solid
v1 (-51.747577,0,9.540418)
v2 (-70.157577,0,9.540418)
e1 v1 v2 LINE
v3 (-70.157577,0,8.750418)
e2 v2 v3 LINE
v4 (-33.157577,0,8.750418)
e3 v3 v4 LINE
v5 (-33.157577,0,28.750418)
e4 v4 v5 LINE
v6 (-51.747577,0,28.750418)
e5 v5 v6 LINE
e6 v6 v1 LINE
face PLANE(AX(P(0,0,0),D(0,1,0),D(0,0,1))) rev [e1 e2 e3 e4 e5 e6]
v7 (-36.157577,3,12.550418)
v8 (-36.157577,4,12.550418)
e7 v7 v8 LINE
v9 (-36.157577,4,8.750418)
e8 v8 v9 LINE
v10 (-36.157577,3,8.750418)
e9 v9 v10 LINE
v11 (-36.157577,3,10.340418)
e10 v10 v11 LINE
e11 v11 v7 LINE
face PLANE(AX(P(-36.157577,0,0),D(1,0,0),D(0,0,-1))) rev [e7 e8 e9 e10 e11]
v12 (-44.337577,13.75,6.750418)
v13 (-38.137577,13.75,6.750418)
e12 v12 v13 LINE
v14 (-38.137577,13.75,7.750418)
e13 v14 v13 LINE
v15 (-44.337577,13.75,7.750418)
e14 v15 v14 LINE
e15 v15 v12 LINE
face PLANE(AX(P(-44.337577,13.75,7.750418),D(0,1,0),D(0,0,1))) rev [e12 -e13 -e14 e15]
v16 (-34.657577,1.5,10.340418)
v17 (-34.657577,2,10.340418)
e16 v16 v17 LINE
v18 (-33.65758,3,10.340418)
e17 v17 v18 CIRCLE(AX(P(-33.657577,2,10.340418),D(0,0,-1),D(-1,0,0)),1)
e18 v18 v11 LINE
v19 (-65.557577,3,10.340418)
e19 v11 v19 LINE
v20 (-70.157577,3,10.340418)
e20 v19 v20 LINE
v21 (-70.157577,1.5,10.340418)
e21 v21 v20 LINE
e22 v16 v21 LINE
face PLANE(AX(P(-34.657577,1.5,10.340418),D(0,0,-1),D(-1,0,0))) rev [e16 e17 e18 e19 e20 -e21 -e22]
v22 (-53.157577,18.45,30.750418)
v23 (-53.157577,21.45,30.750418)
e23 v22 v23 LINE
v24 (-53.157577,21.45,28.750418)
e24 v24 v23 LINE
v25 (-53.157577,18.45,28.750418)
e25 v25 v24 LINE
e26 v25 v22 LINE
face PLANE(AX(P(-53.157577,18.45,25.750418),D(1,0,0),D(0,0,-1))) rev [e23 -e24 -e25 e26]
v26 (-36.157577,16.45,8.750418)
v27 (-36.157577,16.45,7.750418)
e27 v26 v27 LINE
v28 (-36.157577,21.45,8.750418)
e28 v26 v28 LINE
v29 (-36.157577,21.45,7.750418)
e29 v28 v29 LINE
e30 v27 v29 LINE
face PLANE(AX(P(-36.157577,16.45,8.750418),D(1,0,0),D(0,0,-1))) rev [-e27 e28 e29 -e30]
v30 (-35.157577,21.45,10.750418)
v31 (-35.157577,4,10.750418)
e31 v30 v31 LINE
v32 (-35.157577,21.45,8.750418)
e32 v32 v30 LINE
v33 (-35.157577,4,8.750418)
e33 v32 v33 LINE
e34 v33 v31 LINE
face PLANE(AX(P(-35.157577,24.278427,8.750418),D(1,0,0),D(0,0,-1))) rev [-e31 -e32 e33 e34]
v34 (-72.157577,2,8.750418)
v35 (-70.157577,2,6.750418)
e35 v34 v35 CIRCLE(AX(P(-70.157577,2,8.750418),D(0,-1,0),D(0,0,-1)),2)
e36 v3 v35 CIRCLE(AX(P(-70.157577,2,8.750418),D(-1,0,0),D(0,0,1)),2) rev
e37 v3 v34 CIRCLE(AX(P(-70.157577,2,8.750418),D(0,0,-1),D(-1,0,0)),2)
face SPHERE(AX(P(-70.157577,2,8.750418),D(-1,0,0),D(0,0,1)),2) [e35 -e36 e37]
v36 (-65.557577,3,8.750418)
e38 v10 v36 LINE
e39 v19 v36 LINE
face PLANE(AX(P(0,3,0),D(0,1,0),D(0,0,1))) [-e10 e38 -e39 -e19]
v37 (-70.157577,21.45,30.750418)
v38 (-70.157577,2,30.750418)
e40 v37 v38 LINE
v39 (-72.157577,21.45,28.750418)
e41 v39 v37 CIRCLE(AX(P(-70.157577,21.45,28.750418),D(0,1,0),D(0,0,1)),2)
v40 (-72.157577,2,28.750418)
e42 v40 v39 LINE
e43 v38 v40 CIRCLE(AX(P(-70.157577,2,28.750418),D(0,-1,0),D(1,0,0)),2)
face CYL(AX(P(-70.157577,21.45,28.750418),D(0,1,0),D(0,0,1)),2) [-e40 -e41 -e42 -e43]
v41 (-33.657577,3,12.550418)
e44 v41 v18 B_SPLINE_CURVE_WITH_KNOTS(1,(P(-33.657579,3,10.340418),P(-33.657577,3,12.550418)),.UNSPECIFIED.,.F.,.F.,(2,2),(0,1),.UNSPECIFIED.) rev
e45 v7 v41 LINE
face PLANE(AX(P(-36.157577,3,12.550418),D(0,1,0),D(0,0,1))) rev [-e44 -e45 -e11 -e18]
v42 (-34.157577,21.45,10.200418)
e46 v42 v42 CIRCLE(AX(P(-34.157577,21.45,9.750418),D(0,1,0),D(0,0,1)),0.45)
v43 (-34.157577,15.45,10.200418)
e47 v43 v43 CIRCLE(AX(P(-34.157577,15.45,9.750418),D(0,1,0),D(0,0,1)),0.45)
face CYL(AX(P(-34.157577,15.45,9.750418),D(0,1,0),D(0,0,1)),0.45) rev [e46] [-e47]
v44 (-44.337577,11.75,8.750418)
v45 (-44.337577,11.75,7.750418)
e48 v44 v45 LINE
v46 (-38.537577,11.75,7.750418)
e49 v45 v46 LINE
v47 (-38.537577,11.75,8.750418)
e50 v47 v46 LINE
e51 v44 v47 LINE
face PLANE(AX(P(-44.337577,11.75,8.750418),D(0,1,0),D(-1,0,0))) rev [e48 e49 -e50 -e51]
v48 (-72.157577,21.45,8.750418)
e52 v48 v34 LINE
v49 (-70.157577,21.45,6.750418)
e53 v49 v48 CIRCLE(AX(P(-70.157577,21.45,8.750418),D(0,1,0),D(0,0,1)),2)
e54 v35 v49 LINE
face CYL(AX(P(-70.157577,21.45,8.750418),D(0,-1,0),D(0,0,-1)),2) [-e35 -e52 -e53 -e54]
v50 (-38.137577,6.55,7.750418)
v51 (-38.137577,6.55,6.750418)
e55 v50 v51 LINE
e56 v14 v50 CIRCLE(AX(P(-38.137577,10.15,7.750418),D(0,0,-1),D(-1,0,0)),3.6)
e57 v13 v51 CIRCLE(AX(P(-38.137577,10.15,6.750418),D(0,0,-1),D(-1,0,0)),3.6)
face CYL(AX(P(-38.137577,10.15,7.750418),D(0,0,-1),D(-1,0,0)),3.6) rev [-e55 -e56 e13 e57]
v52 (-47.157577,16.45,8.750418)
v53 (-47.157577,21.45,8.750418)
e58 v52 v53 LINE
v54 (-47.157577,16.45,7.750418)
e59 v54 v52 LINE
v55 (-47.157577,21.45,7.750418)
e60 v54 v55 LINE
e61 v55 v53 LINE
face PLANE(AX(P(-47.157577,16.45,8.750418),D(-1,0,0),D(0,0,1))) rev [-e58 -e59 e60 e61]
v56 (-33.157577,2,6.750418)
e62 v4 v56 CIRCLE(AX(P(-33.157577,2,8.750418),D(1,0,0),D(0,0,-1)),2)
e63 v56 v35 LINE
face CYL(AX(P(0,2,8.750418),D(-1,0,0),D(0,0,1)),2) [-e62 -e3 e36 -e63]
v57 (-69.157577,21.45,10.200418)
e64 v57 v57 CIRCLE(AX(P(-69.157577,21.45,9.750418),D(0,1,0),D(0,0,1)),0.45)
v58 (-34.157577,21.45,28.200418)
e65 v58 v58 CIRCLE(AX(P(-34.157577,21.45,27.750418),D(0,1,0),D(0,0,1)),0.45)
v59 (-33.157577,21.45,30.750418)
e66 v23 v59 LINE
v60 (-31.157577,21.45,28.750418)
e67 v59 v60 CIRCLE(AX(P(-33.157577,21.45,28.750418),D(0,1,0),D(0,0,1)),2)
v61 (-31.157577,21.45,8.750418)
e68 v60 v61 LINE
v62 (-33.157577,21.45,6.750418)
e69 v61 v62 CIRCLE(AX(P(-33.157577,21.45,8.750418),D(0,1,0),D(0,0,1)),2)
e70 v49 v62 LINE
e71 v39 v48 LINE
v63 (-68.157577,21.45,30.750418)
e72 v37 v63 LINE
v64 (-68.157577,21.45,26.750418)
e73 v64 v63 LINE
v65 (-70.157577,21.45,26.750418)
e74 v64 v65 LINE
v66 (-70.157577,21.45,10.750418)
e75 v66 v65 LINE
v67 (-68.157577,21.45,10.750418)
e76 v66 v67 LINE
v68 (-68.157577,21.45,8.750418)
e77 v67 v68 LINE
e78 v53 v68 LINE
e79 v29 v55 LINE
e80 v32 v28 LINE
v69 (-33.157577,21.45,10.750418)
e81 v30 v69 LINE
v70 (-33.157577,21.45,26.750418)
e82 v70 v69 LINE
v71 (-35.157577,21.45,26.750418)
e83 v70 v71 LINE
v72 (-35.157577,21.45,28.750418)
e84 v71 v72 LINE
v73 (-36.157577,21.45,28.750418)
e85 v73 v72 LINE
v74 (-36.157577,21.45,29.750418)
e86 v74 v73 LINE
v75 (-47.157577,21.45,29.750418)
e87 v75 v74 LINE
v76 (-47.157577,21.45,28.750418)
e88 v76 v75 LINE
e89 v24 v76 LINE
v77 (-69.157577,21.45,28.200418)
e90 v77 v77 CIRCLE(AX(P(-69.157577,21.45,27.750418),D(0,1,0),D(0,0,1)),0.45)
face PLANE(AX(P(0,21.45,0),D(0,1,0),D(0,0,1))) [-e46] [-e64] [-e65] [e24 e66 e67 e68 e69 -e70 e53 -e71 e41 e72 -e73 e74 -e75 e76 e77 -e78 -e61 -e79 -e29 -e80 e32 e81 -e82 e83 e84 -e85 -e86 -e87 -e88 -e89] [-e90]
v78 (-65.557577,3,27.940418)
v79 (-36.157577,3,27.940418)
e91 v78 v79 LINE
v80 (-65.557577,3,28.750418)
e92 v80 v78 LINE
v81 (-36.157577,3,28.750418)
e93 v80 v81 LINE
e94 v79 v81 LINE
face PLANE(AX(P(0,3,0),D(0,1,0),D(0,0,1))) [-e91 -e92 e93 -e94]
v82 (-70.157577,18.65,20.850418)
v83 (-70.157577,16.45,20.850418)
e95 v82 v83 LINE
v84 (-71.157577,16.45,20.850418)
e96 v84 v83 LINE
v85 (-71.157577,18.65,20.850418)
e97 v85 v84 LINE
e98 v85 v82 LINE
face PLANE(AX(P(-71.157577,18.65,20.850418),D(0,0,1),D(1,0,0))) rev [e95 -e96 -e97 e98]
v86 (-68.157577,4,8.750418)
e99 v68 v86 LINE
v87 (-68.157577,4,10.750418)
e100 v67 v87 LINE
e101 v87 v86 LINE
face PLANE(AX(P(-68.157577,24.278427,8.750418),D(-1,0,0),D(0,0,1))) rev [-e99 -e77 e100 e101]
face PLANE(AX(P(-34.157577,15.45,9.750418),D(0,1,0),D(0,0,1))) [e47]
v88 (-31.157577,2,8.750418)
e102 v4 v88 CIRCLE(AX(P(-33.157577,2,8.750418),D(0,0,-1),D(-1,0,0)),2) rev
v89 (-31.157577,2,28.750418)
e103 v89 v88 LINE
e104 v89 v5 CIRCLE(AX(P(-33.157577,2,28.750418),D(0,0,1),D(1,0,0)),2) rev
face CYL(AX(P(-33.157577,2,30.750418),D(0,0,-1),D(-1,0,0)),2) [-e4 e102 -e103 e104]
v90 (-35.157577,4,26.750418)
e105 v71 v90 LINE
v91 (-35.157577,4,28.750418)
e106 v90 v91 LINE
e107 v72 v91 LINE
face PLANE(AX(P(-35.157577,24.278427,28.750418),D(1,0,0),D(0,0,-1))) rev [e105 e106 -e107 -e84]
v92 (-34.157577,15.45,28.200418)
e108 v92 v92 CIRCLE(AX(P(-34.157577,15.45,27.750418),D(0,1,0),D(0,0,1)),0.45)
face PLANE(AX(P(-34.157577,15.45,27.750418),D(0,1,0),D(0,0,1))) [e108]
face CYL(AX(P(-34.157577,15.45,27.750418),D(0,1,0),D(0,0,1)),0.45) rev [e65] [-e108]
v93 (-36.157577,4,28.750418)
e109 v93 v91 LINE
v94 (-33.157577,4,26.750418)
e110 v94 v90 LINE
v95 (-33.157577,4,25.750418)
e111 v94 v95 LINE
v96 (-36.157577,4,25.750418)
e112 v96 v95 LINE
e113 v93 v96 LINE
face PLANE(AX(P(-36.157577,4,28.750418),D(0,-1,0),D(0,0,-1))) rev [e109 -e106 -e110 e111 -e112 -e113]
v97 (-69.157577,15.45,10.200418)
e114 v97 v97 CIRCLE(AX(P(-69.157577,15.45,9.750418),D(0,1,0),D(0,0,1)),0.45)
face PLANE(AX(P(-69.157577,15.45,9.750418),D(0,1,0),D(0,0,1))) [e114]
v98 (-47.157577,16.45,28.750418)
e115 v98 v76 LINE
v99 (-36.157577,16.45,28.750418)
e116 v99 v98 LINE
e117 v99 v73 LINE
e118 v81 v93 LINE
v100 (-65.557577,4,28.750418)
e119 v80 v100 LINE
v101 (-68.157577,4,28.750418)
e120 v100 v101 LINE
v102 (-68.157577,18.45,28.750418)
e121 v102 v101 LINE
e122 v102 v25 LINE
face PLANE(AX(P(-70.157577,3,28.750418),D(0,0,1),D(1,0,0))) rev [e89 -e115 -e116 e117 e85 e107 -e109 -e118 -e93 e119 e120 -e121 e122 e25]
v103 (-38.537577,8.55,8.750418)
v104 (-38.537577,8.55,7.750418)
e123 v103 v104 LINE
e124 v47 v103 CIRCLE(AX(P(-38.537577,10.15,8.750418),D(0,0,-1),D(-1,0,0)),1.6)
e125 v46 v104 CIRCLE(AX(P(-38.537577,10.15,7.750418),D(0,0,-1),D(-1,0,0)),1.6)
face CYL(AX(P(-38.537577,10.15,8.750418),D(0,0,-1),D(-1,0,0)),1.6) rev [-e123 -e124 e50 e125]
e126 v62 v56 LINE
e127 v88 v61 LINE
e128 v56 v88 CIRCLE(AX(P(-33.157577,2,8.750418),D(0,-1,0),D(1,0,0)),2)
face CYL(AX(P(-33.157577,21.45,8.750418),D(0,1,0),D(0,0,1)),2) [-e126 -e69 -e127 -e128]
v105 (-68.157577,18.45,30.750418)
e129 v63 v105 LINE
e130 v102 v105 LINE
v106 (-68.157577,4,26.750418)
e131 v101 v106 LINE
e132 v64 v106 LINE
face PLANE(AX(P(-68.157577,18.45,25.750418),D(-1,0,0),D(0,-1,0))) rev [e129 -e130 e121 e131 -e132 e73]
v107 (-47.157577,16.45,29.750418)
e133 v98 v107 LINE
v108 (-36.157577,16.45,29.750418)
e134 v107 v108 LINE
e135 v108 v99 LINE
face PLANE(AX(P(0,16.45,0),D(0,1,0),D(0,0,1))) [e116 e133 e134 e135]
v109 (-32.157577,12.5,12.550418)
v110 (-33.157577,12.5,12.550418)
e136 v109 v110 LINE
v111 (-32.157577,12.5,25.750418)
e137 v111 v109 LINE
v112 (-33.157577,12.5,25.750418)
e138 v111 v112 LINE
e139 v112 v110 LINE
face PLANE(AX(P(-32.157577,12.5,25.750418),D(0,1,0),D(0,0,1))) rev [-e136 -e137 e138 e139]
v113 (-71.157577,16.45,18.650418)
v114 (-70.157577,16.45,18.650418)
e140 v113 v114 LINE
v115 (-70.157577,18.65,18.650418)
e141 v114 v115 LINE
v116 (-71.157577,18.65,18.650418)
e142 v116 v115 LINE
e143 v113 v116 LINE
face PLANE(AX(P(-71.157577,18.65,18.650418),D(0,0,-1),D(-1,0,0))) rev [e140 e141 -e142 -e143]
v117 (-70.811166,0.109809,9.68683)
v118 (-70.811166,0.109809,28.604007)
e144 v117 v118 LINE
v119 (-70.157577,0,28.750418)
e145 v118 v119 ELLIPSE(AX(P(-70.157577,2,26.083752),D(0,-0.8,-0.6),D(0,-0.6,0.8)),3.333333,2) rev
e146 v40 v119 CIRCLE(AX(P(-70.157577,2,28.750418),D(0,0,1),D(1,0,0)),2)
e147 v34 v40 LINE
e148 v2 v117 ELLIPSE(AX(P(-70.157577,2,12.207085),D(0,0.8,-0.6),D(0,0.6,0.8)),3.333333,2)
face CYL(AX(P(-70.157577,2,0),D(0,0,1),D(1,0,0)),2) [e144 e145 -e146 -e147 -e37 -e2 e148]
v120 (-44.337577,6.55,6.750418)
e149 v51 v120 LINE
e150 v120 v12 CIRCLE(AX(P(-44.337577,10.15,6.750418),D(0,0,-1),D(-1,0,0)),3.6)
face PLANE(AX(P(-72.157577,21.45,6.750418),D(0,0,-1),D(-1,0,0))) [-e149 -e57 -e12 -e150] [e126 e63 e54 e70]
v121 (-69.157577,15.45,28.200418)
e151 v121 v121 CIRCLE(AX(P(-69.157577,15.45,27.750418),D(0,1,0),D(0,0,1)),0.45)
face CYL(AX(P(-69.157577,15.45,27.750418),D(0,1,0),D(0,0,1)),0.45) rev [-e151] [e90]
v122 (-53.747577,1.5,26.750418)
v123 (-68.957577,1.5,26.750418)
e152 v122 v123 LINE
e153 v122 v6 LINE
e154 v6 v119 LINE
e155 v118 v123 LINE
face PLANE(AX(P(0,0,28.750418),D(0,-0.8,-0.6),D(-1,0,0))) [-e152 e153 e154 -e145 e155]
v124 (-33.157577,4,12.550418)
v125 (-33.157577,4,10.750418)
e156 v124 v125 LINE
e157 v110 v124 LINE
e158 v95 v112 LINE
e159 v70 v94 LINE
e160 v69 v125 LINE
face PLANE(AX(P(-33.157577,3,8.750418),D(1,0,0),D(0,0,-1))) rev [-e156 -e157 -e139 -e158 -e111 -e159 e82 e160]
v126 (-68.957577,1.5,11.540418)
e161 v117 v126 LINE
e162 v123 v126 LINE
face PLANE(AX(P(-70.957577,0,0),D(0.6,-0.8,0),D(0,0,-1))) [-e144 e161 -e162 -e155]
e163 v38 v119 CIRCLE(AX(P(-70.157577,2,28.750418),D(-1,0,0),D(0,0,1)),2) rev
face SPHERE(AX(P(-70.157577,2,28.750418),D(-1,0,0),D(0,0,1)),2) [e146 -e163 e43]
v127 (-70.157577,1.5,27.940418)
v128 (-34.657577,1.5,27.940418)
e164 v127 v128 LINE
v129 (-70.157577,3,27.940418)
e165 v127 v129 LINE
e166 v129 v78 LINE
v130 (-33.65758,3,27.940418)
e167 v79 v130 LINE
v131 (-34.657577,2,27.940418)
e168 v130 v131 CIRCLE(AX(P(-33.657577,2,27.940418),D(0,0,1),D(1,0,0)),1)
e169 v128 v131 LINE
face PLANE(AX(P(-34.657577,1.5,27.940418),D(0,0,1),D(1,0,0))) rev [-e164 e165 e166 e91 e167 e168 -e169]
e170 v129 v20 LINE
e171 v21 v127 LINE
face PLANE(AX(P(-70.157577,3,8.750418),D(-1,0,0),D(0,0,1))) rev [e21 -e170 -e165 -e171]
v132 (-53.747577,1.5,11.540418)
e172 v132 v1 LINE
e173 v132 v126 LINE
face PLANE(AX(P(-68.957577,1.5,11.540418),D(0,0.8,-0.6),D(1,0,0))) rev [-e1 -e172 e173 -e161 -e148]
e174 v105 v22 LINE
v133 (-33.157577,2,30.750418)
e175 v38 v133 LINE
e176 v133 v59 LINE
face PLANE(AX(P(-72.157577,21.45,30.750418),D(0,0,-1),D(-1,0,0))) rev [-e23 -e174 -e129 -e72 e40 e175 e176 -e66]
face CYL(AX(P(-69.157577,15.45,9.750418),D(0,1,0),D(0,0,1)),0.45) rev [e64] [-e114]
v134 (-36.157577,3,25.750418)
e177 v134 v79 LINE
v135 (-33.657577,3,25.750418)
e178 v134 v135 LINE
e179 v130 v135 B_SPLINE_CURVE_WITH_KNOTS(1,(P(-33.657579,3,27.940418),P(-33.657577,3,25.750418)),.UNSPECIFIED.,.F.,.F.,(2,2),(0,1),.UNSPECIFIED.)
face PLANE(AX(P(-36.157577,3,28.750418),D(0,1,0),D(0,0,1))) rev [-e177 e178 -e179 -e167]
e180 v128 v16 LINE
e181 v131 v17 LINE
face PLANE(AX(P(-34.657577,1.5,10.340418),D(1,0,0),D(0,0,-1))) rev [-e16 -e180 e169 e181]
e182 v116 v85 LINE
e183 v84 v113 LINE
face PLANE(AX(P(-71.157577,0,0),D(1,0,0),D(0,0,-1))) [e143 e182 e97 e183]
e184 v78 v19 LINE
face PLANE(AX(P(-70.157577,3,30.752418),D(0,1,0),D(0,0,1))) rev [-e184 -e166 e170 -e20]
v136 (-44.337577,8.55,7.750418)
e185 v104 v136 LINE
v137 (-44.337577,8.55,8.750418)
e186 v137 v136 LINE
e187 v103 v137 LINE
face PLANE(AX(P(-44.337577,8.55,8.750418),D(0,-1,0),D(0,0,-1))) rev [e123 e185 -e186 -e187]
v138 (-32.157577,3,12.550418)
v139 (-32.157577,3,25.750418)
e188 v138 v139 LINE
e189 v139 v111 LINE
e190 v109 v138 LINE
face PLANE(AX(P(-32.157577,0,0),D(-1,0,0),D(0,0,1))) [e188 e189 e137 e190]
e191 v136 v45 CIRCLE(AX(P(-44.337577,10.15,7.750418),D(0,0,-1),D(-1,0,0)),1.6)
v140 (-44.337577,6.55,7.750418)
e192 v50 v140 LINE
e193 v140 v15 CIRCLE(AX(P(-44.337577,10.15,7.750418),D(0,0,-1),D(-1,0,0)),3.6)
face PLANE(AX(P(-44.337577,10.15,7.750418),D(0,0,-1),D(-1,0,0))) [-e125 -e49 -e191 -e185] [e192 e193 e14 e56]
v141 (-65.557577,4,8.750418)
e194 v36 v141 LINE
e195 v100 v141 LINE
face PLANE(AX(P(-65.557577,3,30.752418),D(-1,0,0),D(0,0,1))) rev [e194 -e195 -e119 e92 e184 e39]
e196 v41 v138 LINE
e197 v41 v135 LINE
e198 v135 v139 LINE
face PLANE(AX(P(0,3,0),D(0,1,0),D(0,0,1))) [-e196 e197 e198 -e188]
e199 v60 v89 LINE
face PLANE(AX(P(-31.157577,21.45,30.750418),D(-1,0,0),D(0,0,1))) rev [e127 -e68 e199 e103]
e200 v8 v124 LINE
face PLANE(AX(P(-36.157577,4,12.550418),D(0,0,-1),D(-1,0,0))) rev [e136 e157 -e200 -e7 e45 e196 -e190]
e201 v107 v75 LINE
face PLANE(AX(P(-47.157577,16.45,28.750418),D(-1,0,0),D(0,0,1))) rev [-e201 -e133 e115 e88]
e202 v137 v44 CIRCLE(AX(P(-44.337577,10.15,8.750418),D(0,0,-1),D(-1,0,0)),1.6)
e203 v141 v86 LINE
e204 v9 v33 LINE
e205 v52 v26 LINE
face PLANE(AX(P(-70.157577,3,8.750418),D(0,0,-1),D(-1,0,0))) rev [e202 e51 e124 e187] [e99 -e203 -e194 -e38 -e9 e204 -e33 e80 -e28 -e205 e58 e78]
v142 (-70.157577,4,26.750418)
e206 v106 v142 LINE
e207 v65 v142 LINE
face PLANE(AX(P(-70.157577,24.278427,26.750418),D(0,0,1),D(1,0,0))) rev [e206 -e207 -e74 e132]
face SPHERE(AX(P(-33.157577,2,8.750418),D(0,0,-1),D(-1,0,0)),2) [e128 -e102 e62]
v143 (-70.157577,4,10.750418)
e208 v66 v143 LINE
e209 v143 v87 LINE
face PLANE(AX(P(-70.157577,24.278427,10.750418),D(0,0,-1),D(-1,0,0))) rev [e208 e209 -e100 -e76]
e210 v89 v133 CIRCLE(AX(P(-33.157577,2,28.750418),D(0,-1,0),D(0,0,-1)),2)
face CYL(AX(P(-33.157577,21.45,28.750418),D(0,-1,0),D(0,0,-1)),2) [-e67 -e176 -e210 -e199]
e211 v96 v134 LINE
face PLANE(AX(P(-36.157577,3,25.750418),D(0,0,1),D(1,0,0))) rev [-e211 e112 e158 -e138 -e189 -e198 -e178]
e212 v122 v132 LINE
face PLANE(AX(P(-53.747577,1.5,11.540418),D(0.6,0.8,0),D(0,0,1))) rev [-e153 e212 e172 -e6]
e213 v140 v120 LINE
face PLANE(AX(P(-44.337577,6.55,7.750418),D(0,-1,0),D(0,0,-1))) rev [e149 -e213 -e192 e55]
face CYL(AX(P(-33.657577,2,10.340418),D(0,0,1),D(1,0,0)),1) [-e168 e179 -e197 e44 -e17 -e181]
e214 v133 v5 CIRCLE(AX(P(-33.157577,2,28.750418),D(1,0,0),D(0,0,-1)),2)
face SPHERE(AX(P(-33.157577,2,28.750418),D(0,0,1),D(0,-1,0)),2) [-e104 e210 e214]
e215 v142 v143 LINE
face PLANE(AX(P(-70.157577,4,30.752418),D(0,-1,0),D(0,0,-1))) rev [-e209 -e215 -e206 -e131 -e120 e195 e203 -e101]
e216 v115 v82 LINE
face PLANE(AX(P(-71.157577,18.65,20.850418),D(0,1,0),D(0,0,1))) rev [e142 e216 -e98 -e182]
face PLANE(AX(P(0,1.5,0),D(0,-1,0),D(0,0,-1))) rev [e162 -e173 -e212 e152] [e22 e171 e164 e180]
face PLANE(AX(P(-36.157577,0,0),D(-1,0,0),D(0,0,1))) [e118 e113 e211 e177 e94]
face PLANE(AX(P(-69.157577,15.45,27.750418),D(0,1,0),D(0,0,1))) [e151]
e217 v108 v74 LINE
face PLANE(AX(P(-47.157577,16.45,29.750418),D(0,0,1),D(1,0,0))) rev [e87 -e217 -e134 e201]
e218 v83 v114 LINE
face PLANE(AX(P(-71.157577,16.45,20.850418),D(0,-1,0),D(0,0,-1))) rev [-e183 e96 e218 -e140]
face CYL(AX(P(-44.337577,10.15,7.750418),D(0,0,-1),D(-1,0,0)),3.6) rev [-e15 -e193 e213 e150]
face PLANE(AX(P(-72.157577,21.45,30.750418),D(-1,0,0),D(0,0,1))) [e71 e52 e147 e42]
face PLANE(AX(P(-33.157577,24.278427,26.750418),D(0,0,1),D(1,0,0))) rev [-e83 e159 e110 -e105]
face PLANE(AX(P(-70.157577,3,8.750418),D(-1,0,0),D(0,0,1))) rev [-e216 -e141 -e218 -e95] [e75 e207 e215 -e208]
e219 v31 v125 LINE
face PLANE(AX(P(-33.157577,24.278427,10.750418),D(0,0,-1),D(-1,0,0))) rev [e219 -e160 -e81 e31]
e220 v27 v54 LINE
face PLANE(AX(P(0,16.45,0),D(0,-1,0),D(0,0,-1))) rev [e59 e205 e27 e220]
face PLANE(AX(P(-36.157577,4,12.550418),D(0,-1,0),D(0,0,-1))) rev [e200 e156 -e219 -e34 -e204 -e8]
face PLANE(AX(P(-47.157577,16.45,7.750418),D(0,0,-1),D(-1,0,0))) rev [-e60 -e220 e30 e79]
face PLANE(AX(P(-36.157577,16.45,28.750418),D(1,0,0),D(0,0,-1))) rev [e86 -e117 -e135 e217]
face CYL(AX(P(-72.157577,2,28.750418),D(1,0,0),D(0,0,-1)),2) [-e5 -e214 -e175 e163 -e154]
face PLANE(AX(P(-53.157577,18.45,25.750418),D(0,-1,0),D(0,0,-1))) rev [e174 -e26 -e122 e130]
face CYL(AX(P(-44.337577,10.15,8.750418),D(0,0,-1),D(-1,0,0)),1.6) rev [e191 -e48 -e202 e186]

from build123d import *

# Parameters (mm, degrees)
SKETCH_1_W           = 41
SKETCH_1_H           = 24
EXTRUDE_1_DEPTH      = 21.45
SKETCH_2_W           = 37
SKETCH_2_H           = 20
CUT_EXTRUDE_1_DEPTH  = 18.45
SKETCH_4_W           = 15.21
SKETCH_4_H           = 15.21
CUT_EXTRUDE_2_DEPTH  = 15
SKETCH_6_W           = 15
SKETCH_6_H           = 3
CUT_EXTRUDE_4_DEPTH  = 5
CUT_EXTRUDE_7_DEPTH  = 1
CUT_EXTRUDE_8_DEPTH  = 1
SKETCH_11_W          = 35.5
SKETCH_11_H          = 17.6
CUT_EXTRUDE_10_DEPTH = 1.5
SKETCH_13_W          = 11
SKETCH_13_H          = 1
CUT_EXTRUDE_12_DEPTH = 5
FILLET_2_R           = 2
CHAMFER_2_SIZE       = 2
CHAMFER_2_SIZE_2     = 1.5
SKETCH_19_W          = 2.2
SKETCH_19_H          = 2.2
CUT_EXTRUDE_16_DEPTH = 1
SKETCH_21_W          = 3.8
SKETCH_21_H          = 1
SKETCH_21_W_2        = 3
EXTRUDE_4_DEPTH      = 3
FILLET_8_R           = 1
SKETCH_24_W          = 13.2
SKETCH_24_H          = 9.5
CUT_EXTRUDE_17_DEPTH = 1
EXTRUDE_6_REACH      = 80.427
SKETCH_27_W          = 4.6
SKETCH_27_H          = 1
SKETCH_28_W          = 2
SKETCH_28_H          = 2
EXTRUDE_7_DEPTH      = 17.45
SKETCH_29_R          = 0.45
CUT_EXTRUDE_18_DEPTH = 6


with BuildPart() as part:
    # 草图1 → 凸台-拉伸1 (new body)
    with BuildSketch(Plane(origin=(0, 0, 0), x_dir=(1, 0, 0), z_dir=(0, 1, 0))):
        with Locations((-51.657577391, -18.750418409)):
            Rectangle(SKETCH_1_W, SKETCH_1_H)
    extrude(amount=EXTRUDE_1_DEPTH)

    # 草图2 → 切除-拉伸1 (cut)
    with BuildSketch(Plane(origin=(0, 21.45, 0), x_dir=(1, 0, 0), z_dir=(0, 1, 0))):
        with Locations((-51.657577391, -18.750418409)):
            Rectangle(SKETCH_2_W, SKETCH_2_H)
    extrude(amount=-CUT_EXTRUDE_1_DEPTH, mode=Mode.SUBTRACT)

    # 草图4 → 切除-拉伸2 (cut)
    with BuildSketch(Plane(origin=(0, 0, 0), x_dir=(-1, 0, 0), z_dir=(0, -1, 0))):
        with Locations((61.352577391, -19.145418409)):
            Rectangle(SKETCH_4_W, SKETCH_4_H)
    extrude(amount=-CUT_EXTRUDE_2_DEPTH, mode=Mode.SUBTRACT)

    # 草图6 → 切除-拉伸4 (cut)
    with BuildSketch(Plane.XY.offset(30.750418409)):
        with Locations((-60.657577391, 19.95)):
            Rectangle(SKETCH_6_W, SKETCH_6_H)
    extrude(amount=-CUT_EXTRUDE_4_DEPTH, mode=Mode.SUBTRACT)

    # 草图7 → 切除-拉伸7 (cut)
    with BuildSketch(Plane(origin=(0, 0, 6.750418409), x_dir=(-1, 0, 0), z_dir=(0, 0, -1))):
        with BuildLine():
            Line((44.337577391, 6.55), (38.137577391, 6.55))
            ThreePointArc((38.137577391, 6.55), (34.537577391, 10.15), (38.137577391, 13.75))
            Line((38.137577391, 13.75), (44.337577391, 13.75))
            ThreePointArc((44.337577391, 13.75), (47.937577391, 10.15), (44.337577391, 6.55))
        make_face()
    extrude(amount=-CUT_EXTRUDE_7_DEPTH, mode=Mode.SUBTRACT)

    # 草图9 → 切除-拉伸8 (cut)
    with BuildSketch(Plane(origin=(0, 0, 7.750418409), x_dir=(-1, 0, 0), z_dir=(0, 0, -1))):
        with BuildLine():
            Line((44.337577391, 8.55), (38.537577391, 8.55))
            ThreePointArc((38.537577391, 8.55), (36.937577391, 10.15), (38.537577391, 11.75))
            Line((38.537577391, 11.75), (44.337577391, 11.75))
            ThreePointArc((44.337577391, 11.75), (45.937577391, 10.15), (44.337577391, 8.55))
        make_face()
    extrude(amount=-CUT_EXTRUDE_8_DEPTH, mode=Mode.SUBTRACT)

    # 草图11 → 切除-拉伸10 (cut)
    with BuildSketch(Plane(origin=(0, 3, 0), x_dir=(1, 0, 0), z_dir=(0, 1, 0))):
        with Locations((-52.407577391, -19.140418409)):
            Rectangle(SKETCH_11_W, SKETCH_11_H)
    extrude(amount=-CUT_EXTRUDE_10_DEPTH, mode=Mode.SUBTRACT)

    # 草图13 → 切除-拉伸12 (cut)
    with BuildSketch(Plane(origin=(0, 21.45, 0), x_dir=(1, 0, 0), z_dir=(0, 1, 0))):
        with Locations((-41.657577391, -29.250418409)):
            Rectangle(SKETCH_13_W, SKETCH_13_H)
        with Locations((-41.657577391, -8.250418409)):
            Rectangle(SKETCH_13_W, SKETCH_13_H)
    extrude(amount=-CUT_EXTRUDE_12_DEPTH, mode=Mode.SUBTRACT)

    # 圆角2
    fillet_2_edges = [part.edges().sort_by_distance(p)[0] for p in [
        (-72.157577391, 0, 18.750418409),
        (-51.657577391, 0, 30.750418409),
        (-31.157577391, 0, 18.750418409),
        (-51.657577391, 0, 6.750418409),
        (-72.157577391, 10.725, 6.750418409),
        (-72.157577391, 10.725, 30.750418409),
        (-31.157577391, 10.725, 30.750418409),
        (-31.157577391, 10.725, 6.750418409),
    ]]
    fillet(fillet_2_edges, radius=FILLET_2_R)

    # 倒角2
    # the kernel refuses this chamfer: 2, 1.5 mm, written as the material it takes off along each edge
    with BuildSketch(Plane(origin=(-53.747577391, 0, 26.750418409), x_dir=(0, -0.02324952774876386, 0.9997296931968459), z_dir=(-1, 0, 0)), Plane(origin=(-53.747577391, 0, 11.540418409), x_dir=(0.9997296931968459, -0.02324952774876386, 0), z_dir=(0, 0, 1)), Plane(origin=(-68.957577391, 0, 11.540418409), x_dir=(0, -0.02324952774876386, -0.9997296931968459), z_dir=(1, 0, 0)), Plane(origin=(-68.957577391, 0, 26.750418409), x_dir=(-0.9997296931968459, -0.02324952774876394, 0), z_dir=(0, 0, -1))) as chamfer_2_piece_1:
        Polygon((CHAMFER_2_SIZE * 0.999729693197, CHAMFER_2_SIZE * 0.0232495277488), (-CHAMFER_2_SIZE_2 * 0.0232495277488, CHAMFER_2_SIZE_2 * 0.999729693197), (0, 0), align=None)
    extrude(amount=15.21, mode=Mode.SUBTRACT)
    with BuildSketch(Plane(origin=(-48.58618223, 0, 26.750418409), x_dir=(0, -0.02324952774876386, 0.9997296931968459), z_dir=(-1, 0, 0))) as chamfer_2_piece_2a_section:
        Polygon((CHAMFER_2_SIZE * 0.999729693197, CHAMFER_2_SIZE * 0.0232495277488), (-CHAMFER_2_SIZE_2 * 0.0232495277488, CHAMFER_2_SIZE_2 * 0.999729693197), (0, 0), align=None)
    chamfer_2_piece_2a = extrude(amount=20.37139516, mode=Mode.PRIVATE)
    chamfer_2_piece_2a = split(chamfer_2_piece_2a, bisect_by=Plane(origin=(-53.747577391, 0.488589108, 27.415308917), z_dir=(1, 0, 0)), keep=Keep.TOP, mode=Mode.PRIVATE)
    with BuildSketch(Plane(origin=(-53.747577391, 0, 11.540418409), x_dir=(0.9997296931968459, -0.02324952774876386, 0), z_dir=(0, 0, 1))) as chamfer_2_piece_2b_section:
        Polygon((CHAMFER_2_SIZE * 0.999729693197, CHAMFER_2_SIZE * 0.0232495277488), (-CHAMFER_2_SIZE_2 * 0.0232495277488, CHAMFER_2_SIZE_2 * 0.999729693197), (0, 0), align=None)
    chamfer_2_piece_2b = extrude(amount=20.37139516, mode=Mode.PRIVATE)
    chamfer_2_piece_2b = split(chamfer_2_piece_2b, bisect_by=Plane(origin=(-53.082686882, 0.488589108, 26.750418409), z_dir=(0, 0, 1)), keep=Keep.TOP, mode=Mode.PRIVATE)
    chamfer_2_piece_2 = chamfer_2_piece_2a & chamfer_2_piece_2b
    add(chamfer_2_piece_2, mode=Mode.SUBTRACT)
    with BuildSketch(Plane(origin=(-68.957577391, 0, 31.911813569), x_dir=(-0.9997296931968459, -0.02324952774876394, 0), z_dir=(0, 0, -1))) as chamfer_2_piece_3a_section:
        Polygon((CHAMFER_2_SIZE * 0.999729693197, CHAMFER_2_SIZE * 0.0232495277488), (-CHAMFER_2_SIZE_2 * 0.0232495277488, CHAMFER_2_SIZE_2 * 0.999729693197), (0, 0), align=None)
    chamfer_2_piece_3a = extrude(amount=20.37139516, mode=Mode.PRIVATE)
    chamfer_2_piece_3a = split(chamfer_2_piece_3a, bisect_by=Plane(origin=(-69.622467899, 0.488589108, 26.750418409), z_dir=(0, 0, 1)), keep=Keep.TOP, mode=Mode.PRIVATE)
    with BuildSketch(Plane(origin=(-53.747577391, 0, 26.750418409), x_dir=(0, -0.02324952774876386, 0.9997296931968459), z_dir=(-1, 0, 0))) as chamfer_2_piece_3b_section:
        Polygon((CHAMFER_2_SIZE * 0.999729693197, CHAMFER_2_SIZE * 0.0232495277488), (-CHAMFER_2_SIZE_2 * 0.0232495277488, CHAMFER_2_SIZE_2 * 0.999729693197), (0, 0), align=None)
    chamfer_2_piece_3b = extrude(amount=20.37139516, mode=Mode.PRIVATE)
    chamfer_2_piece_3b = split(chamfer_2_piece_3b, bisect_by=Plane(origin=(-68.957577391, 0.488589108, 27.415308917), z_dir=(-1, 0, 0)), keep=Keep.TOP, mode=Mode.PRIVATE)
    chamfer_2_piece_3 = chamfer_2_piece_3a & chamfer_2_piece_3b
    add(chamfer_2_piece_3, mode=Mode.SUBTRACT)
    with BuildSketch(Plane(origin=(-53.747577391, 0, 6.379023249), x_dir=(0.9997296931968459, -0.02324952774876386, 0), z_dir=(0, 0, 1))) as chamfer_2_piece_4a_section:
        Polygon((CHAMFER_2_SIZE * 0.999729693197, CHAMFER_2_SIZE * 0.0232495277488), (-CHAMFER_2_SIZE_2 * 0.0232495277488, CHAMFER_2_SIZE_2 * 0.999729693197), (0, 0), align=None)
    chamfer_2_piece_4a = extrude(amount=20.37139516, mode=Mode.PRIVATE)
    chamfer_2_piece_4a = split(chamfer_2_piece_4a, bisect_by=Plane(origin=(-53.082686882, 0.488589108, 11.540418409), z_dir=(0, 0, -1)), keep=Keep.TOP, mode=Mode.PRIVATE)
    with BuildSketch(Plane(origin=(-68.957577391, 0, 11.540418409), x_dir=(0, -0.02324952774876386, -0.9997296931968459), z_dir=(1, 0, 0))) as chamfer_2_piece_4b_section:
        Polygon((CHAMFER_2_SIZE * 0.999729693197, CHAMFER_2_SIZE * 0.0232495277488), (-CHAMFER_2_SIZE_2 * 0.0232495277488, CHAMFER_2_SIZE_2 * 0.999729693197), (0, 0), align=None)
    chamfer_2_piece_4b = extrude(amount=20.37139516, mode=Mode.PRIVATE)
    chamfer_2_piece_4b = split(chamfer_2_piece_4b, bisect_by=Plane(origin=(-53.747577391, 0.488589108, 10.875527901), z_dir=(1, 0, 0)), keep=Keep.TOP, mode=Mode.PRIVATE)
    chamfer_2_piece_4 = chamfer_2_piece_4a & chamfer_2_piece_4b
    add(chamfer_2_piece_4, mode=Mode.SUBTRACT)
    with BuildSketch(Plane(origin=(-68.957577391, 0, 26.750418409), x_dir=(-0.9997296931968459, -0.02324952774876394, 0), z_dir=(0, 0, -1))) as chamfer_2_piece_5a_section:
        Polygon((CHAMFER_2_SIZE * 0.999729693197, CHAMFER_2_SIZE * 0.0232495277488), (-CHAMFER_2_SIZE_2 * 0.0232495277488, CHAMFER_2_SIZE_2 * 0.999729693197), (0, 0), align=None)
    chamfer_2_piece_5a = extrude(amount=20.37139516, mode=Mode.PRIVATE)
    chamfer_2_piece_5a = split(chamfer_2_piece_5a, bisect_by=Plane(origin=(-69.622467899, 0.488589108, 11.540418409), z_dir=(0, 0, -1)), keep=Keep.TOP, mode=Mode.PRIVATE)
    with BuildSketch(Plane(origin=(-74.118972551, 0, 11.540418409), x_dir=(0, -0.02324952774876386, -0.9997296931968459), z_dir=(1, 0, 0))) as chamfer_2_piece_5b_section:
        Polygon((CHAMFER_2_SIZE * 0.999729693197, CHAMFER_2_SIZE * 0.0232495277488), (-CHAMFER_2_SIZE_2 * 0.0232495277488, CHAMFER_2_SIZE_2 * 0.999729693197), (0, 0), align=None)
    chamfer_2_piece_5b = extrude(amount=20.37139516, mode=Mode.PRIVATE)
    chamfer_2_piece_5b = split(chamfer_2_piece_5b, bisect_by=Plane(origin=(-68.957577391, 0.488589108, 10.875527901), z_dir=(-1, 0, 0)), keep=Keep.TOP, mode=Mode.PRIVATE)
    chamfer_2_piece_5 = chamfer_2_piece_5a & chamfer_2_piece_5b
    add(chamfer_2_piece_5, mode=Mode.SUBTRACT)

    # 草图19 → 切除-拉伸16 (cut)
    with BuildSketch(Plane(origin=(-70.157577391, 0, 0), x_dir=(0, 0, -1), z_dir=(1, 0, 0))):
        with Locations((-19.750418409, 17.55)):
            Rectangle(SKETCH_19_W, SKETCH_19_H)
    extrude(amount=-CUT_EXTRUDE_16_DEPTH, mode=Mode.SUBTRACT)

    # 草图21 → 凸台-拉伸4 (add)
    with BuildSketch(Plane.ZY.offset(33.157577391)):
        with Locations((10.650418409, 3.5)):
            Rectangle(SKETCH_21_W, SKETCH_21_H)
        with Locations((27.250418409, 3.5)):
            Rectangle(SKETCH_21_W_2, SKETCH_21_H)
    extrude(amount=EXTRUDE_4_DEPTH)

    # 圆角8
    # the kernel refuses this fillet: 1 mm, written as the material it takes off along each edge
    with BuildSketch(Plane(origin=(-34.657577391, 3, 28.250418409), x_dir=(1, 0, 0), z_dir=(0, 0, -1))) as fillet_8_piece_1_section:
        with BuildLine():
            CenterArc((FILLET_8_R, FILLET_8_R), FILLET_8_R, 180, 90)
            Line((0, FILLET_8_R), (0, 0))
            Line((0, 0), (FILLET_8_R, 0))
        make_face()
    fillet_8_piece_1 = extrude(amount=15.7, mode=Mode.PRIVATE)
    fillet_8_piece_1 = split(fillet_8_piece_1, bisect_by=Plane(origin=(-34.454104261, 2.75304895, 27.940418409), z_dir=(0, 0, -1)), keep=Keep.TOP, mode=Mode.PRIVATE)
    fillet_8_piece_1 = split(fillet_8_piece_1, bisect_by=Plane(origin=(-34.454104261, 2.75304895, 25.750418409), z_dir=(0, 0, 1)), keep=Keep.TOP, mode=Mode.PRIVATE)
    fillet_8_piece_1 = split(fillet_8_piece_1, bisect_by=Plane(origin=(-34.454104261, 3, 26.845418409), z_dir=(0, -1, 0)), keep=Keep.TOP, mode=Mode.PRIVATE)
    add(fillet_8_piece_1, mode=Mode.SUBTRACT)
    with BuildSketch(Plane(origin=(-34.657577391, 3, 25.750418409), x_dir=(1, 0, 0), z_dir=(0, 0, -1))) as fillet_8_piece_2_section:
        with BuildLine():
            CenterArc((FILLET_8_R, FILLET_8_R), FILLET_8_R, 180, 90)
            Line((0, FILLET_8_R), (0, 0))
            Line((0, 0), (FILLET_8_R, 0))
        make_face()
    fillet_8_piece_2 = extrude(amount=13.2, mode=Mode.PRIVATE)
    fillet_8_piece_2 = split(fillet_8_piece_2, bisect_by=Plane(origin=(-34.454104261, 3, 19.150418409), z_dir=(0, -1, 0)), keep=Keep.TOP, mode=Mode.PRIVATE)
    add(fillet_8_piece_2, mode=Mode.SUBTRACT)
    with BuildSketch(Plane(origin=(-34.657577391, 3, 25.750418409), x_dir=(1, 0, 0), z_dir=(0, 0, -1))) as fillet_8_piece_3_section:
        with BuildLine():
            CenterArc((FILLET_8_R, FILLET_8_R), FILLET_8_R, 180, 90)
            Line((0, FILLET_8_R), (0, 0))
            Line((0, 0), (FILLET_8_R, 0))
        make_face()
    fillet_8_piece_3 = extrude(amount=15.7, mode=Mode.PRIVATE)
    fillet_8_piece_3 = split(fillet_8_piece_3, bisect_by=Plane(origin=(-34.454104261, 2.75304895, 10.340418409), z_dir=(0, 0, 1)), keep=Keep.TOP, mode=Mode.PRIVATE)
    fillet_8_piece_3 = split(fillet_8_piece_3, bisect_by=Plane(origin=(-34.454104261, 2.75304895, 12.550418409), z_dir=(0, 0, -1)), keep=Keep.TOP, mode=Mode.PRIVATE)
    fillet_8_piece_3 = split(fillet_8_piece_3, bisect_by=Plane(origin=(-34.454104261, 3, 11.445418409), z_dir=(0, -1, 0)), keep=Keep.TOP, mode=Mode.PRIVATE)
    add(fillet_8_piece_3, mode=Mode.SUBTRACT)

    # 草图24 → 切除-拉伸17 (cut)
    with BuildSketch(Plane.ZY.offset(33.157577391)):
        with Locations((19.150418409, 7.75)):
            Rectangle(SKETCH_24_W, SKETCH_24_H)
    extrude(amount=-CUT_EXTRUDE_17_DEPTH, mode=Mode.SUBTRACT)

    # 草图27 → 凸台-拉伸6 (add, up to next)
    with BuildSketch(Plane.XY.offset(8.750418409), mode=Mode.PRIVATE) as extrude_6_sk1:
        with Locations((-67.857577391, 3.5)):
            Rectangle(SKETCH_27_W, SKETCH_27_H)
    extrude_6_tool1 = extrude(extrude_6_sk1.sketch, amount=EXTRUDE_6_REACH, mode=Mode.PRIVATE) - part.part
    add(extrude_6_tool1.solids().sort_by_distance((-67.857577, 3.5, 8.750418))[0])

    # 草图28 → 凸台-拉伸7 (add)
    with BuildSketch(Plane(origin=(0, 4, 0), x_dir=(1, 0, 0), z_dir=(0, 1, 0))):
        with Locations((-69.157577391, -9.750418409)):
            Rectangle(SKETCH_28_W, SKETCH_28_H)
        with Locations((-34.157577391, -9.750418409)):
            Rectangle(SKETCH_28_W, SKETCH_28_H)
        with Locations((-69.157577391, -27.750418409)):
            Rectangle(SKETCH_28_W, SKETCH_28_H)
        with Locations((-34.157577391, -27.750418409)):
            Rectangle(SKETCH_28_W, SKETCH_28_H)
    extrude(amount=EXTRUDE_7_DEPTH)

    # 草图29 → 切除-拉伸18 (cut)
    with BuildSketch(Plane(origin=(0, 21.45, 0), x_dir=(1, 0, 0), z_dir=(0, 1, 0))):
        with Locations(Location((-69.157577391, -9.750418409, 0), (0, 0, 270))):
            Circle(SKETCH_29_R)
        with Locations(Location((-69.157577391, -27.750418409, 0), (0, 0, 270))):
            Circle(SKETCH_29_R)
        with Locations(Location((-34.157577391, -9.750418409, 0), (0, 0, 270))):
            Circle(SKETCH_29_R)
        with Locations(Location((-34.157577391, -27.750418409, 0), (0, 0, 270))):
            Circle(SKETCH_29_R)
    extrude(amount=-CUT_EXTRUDE_18_DEPTH, mode=Mode.SUBTRACT)


solid = part.part
